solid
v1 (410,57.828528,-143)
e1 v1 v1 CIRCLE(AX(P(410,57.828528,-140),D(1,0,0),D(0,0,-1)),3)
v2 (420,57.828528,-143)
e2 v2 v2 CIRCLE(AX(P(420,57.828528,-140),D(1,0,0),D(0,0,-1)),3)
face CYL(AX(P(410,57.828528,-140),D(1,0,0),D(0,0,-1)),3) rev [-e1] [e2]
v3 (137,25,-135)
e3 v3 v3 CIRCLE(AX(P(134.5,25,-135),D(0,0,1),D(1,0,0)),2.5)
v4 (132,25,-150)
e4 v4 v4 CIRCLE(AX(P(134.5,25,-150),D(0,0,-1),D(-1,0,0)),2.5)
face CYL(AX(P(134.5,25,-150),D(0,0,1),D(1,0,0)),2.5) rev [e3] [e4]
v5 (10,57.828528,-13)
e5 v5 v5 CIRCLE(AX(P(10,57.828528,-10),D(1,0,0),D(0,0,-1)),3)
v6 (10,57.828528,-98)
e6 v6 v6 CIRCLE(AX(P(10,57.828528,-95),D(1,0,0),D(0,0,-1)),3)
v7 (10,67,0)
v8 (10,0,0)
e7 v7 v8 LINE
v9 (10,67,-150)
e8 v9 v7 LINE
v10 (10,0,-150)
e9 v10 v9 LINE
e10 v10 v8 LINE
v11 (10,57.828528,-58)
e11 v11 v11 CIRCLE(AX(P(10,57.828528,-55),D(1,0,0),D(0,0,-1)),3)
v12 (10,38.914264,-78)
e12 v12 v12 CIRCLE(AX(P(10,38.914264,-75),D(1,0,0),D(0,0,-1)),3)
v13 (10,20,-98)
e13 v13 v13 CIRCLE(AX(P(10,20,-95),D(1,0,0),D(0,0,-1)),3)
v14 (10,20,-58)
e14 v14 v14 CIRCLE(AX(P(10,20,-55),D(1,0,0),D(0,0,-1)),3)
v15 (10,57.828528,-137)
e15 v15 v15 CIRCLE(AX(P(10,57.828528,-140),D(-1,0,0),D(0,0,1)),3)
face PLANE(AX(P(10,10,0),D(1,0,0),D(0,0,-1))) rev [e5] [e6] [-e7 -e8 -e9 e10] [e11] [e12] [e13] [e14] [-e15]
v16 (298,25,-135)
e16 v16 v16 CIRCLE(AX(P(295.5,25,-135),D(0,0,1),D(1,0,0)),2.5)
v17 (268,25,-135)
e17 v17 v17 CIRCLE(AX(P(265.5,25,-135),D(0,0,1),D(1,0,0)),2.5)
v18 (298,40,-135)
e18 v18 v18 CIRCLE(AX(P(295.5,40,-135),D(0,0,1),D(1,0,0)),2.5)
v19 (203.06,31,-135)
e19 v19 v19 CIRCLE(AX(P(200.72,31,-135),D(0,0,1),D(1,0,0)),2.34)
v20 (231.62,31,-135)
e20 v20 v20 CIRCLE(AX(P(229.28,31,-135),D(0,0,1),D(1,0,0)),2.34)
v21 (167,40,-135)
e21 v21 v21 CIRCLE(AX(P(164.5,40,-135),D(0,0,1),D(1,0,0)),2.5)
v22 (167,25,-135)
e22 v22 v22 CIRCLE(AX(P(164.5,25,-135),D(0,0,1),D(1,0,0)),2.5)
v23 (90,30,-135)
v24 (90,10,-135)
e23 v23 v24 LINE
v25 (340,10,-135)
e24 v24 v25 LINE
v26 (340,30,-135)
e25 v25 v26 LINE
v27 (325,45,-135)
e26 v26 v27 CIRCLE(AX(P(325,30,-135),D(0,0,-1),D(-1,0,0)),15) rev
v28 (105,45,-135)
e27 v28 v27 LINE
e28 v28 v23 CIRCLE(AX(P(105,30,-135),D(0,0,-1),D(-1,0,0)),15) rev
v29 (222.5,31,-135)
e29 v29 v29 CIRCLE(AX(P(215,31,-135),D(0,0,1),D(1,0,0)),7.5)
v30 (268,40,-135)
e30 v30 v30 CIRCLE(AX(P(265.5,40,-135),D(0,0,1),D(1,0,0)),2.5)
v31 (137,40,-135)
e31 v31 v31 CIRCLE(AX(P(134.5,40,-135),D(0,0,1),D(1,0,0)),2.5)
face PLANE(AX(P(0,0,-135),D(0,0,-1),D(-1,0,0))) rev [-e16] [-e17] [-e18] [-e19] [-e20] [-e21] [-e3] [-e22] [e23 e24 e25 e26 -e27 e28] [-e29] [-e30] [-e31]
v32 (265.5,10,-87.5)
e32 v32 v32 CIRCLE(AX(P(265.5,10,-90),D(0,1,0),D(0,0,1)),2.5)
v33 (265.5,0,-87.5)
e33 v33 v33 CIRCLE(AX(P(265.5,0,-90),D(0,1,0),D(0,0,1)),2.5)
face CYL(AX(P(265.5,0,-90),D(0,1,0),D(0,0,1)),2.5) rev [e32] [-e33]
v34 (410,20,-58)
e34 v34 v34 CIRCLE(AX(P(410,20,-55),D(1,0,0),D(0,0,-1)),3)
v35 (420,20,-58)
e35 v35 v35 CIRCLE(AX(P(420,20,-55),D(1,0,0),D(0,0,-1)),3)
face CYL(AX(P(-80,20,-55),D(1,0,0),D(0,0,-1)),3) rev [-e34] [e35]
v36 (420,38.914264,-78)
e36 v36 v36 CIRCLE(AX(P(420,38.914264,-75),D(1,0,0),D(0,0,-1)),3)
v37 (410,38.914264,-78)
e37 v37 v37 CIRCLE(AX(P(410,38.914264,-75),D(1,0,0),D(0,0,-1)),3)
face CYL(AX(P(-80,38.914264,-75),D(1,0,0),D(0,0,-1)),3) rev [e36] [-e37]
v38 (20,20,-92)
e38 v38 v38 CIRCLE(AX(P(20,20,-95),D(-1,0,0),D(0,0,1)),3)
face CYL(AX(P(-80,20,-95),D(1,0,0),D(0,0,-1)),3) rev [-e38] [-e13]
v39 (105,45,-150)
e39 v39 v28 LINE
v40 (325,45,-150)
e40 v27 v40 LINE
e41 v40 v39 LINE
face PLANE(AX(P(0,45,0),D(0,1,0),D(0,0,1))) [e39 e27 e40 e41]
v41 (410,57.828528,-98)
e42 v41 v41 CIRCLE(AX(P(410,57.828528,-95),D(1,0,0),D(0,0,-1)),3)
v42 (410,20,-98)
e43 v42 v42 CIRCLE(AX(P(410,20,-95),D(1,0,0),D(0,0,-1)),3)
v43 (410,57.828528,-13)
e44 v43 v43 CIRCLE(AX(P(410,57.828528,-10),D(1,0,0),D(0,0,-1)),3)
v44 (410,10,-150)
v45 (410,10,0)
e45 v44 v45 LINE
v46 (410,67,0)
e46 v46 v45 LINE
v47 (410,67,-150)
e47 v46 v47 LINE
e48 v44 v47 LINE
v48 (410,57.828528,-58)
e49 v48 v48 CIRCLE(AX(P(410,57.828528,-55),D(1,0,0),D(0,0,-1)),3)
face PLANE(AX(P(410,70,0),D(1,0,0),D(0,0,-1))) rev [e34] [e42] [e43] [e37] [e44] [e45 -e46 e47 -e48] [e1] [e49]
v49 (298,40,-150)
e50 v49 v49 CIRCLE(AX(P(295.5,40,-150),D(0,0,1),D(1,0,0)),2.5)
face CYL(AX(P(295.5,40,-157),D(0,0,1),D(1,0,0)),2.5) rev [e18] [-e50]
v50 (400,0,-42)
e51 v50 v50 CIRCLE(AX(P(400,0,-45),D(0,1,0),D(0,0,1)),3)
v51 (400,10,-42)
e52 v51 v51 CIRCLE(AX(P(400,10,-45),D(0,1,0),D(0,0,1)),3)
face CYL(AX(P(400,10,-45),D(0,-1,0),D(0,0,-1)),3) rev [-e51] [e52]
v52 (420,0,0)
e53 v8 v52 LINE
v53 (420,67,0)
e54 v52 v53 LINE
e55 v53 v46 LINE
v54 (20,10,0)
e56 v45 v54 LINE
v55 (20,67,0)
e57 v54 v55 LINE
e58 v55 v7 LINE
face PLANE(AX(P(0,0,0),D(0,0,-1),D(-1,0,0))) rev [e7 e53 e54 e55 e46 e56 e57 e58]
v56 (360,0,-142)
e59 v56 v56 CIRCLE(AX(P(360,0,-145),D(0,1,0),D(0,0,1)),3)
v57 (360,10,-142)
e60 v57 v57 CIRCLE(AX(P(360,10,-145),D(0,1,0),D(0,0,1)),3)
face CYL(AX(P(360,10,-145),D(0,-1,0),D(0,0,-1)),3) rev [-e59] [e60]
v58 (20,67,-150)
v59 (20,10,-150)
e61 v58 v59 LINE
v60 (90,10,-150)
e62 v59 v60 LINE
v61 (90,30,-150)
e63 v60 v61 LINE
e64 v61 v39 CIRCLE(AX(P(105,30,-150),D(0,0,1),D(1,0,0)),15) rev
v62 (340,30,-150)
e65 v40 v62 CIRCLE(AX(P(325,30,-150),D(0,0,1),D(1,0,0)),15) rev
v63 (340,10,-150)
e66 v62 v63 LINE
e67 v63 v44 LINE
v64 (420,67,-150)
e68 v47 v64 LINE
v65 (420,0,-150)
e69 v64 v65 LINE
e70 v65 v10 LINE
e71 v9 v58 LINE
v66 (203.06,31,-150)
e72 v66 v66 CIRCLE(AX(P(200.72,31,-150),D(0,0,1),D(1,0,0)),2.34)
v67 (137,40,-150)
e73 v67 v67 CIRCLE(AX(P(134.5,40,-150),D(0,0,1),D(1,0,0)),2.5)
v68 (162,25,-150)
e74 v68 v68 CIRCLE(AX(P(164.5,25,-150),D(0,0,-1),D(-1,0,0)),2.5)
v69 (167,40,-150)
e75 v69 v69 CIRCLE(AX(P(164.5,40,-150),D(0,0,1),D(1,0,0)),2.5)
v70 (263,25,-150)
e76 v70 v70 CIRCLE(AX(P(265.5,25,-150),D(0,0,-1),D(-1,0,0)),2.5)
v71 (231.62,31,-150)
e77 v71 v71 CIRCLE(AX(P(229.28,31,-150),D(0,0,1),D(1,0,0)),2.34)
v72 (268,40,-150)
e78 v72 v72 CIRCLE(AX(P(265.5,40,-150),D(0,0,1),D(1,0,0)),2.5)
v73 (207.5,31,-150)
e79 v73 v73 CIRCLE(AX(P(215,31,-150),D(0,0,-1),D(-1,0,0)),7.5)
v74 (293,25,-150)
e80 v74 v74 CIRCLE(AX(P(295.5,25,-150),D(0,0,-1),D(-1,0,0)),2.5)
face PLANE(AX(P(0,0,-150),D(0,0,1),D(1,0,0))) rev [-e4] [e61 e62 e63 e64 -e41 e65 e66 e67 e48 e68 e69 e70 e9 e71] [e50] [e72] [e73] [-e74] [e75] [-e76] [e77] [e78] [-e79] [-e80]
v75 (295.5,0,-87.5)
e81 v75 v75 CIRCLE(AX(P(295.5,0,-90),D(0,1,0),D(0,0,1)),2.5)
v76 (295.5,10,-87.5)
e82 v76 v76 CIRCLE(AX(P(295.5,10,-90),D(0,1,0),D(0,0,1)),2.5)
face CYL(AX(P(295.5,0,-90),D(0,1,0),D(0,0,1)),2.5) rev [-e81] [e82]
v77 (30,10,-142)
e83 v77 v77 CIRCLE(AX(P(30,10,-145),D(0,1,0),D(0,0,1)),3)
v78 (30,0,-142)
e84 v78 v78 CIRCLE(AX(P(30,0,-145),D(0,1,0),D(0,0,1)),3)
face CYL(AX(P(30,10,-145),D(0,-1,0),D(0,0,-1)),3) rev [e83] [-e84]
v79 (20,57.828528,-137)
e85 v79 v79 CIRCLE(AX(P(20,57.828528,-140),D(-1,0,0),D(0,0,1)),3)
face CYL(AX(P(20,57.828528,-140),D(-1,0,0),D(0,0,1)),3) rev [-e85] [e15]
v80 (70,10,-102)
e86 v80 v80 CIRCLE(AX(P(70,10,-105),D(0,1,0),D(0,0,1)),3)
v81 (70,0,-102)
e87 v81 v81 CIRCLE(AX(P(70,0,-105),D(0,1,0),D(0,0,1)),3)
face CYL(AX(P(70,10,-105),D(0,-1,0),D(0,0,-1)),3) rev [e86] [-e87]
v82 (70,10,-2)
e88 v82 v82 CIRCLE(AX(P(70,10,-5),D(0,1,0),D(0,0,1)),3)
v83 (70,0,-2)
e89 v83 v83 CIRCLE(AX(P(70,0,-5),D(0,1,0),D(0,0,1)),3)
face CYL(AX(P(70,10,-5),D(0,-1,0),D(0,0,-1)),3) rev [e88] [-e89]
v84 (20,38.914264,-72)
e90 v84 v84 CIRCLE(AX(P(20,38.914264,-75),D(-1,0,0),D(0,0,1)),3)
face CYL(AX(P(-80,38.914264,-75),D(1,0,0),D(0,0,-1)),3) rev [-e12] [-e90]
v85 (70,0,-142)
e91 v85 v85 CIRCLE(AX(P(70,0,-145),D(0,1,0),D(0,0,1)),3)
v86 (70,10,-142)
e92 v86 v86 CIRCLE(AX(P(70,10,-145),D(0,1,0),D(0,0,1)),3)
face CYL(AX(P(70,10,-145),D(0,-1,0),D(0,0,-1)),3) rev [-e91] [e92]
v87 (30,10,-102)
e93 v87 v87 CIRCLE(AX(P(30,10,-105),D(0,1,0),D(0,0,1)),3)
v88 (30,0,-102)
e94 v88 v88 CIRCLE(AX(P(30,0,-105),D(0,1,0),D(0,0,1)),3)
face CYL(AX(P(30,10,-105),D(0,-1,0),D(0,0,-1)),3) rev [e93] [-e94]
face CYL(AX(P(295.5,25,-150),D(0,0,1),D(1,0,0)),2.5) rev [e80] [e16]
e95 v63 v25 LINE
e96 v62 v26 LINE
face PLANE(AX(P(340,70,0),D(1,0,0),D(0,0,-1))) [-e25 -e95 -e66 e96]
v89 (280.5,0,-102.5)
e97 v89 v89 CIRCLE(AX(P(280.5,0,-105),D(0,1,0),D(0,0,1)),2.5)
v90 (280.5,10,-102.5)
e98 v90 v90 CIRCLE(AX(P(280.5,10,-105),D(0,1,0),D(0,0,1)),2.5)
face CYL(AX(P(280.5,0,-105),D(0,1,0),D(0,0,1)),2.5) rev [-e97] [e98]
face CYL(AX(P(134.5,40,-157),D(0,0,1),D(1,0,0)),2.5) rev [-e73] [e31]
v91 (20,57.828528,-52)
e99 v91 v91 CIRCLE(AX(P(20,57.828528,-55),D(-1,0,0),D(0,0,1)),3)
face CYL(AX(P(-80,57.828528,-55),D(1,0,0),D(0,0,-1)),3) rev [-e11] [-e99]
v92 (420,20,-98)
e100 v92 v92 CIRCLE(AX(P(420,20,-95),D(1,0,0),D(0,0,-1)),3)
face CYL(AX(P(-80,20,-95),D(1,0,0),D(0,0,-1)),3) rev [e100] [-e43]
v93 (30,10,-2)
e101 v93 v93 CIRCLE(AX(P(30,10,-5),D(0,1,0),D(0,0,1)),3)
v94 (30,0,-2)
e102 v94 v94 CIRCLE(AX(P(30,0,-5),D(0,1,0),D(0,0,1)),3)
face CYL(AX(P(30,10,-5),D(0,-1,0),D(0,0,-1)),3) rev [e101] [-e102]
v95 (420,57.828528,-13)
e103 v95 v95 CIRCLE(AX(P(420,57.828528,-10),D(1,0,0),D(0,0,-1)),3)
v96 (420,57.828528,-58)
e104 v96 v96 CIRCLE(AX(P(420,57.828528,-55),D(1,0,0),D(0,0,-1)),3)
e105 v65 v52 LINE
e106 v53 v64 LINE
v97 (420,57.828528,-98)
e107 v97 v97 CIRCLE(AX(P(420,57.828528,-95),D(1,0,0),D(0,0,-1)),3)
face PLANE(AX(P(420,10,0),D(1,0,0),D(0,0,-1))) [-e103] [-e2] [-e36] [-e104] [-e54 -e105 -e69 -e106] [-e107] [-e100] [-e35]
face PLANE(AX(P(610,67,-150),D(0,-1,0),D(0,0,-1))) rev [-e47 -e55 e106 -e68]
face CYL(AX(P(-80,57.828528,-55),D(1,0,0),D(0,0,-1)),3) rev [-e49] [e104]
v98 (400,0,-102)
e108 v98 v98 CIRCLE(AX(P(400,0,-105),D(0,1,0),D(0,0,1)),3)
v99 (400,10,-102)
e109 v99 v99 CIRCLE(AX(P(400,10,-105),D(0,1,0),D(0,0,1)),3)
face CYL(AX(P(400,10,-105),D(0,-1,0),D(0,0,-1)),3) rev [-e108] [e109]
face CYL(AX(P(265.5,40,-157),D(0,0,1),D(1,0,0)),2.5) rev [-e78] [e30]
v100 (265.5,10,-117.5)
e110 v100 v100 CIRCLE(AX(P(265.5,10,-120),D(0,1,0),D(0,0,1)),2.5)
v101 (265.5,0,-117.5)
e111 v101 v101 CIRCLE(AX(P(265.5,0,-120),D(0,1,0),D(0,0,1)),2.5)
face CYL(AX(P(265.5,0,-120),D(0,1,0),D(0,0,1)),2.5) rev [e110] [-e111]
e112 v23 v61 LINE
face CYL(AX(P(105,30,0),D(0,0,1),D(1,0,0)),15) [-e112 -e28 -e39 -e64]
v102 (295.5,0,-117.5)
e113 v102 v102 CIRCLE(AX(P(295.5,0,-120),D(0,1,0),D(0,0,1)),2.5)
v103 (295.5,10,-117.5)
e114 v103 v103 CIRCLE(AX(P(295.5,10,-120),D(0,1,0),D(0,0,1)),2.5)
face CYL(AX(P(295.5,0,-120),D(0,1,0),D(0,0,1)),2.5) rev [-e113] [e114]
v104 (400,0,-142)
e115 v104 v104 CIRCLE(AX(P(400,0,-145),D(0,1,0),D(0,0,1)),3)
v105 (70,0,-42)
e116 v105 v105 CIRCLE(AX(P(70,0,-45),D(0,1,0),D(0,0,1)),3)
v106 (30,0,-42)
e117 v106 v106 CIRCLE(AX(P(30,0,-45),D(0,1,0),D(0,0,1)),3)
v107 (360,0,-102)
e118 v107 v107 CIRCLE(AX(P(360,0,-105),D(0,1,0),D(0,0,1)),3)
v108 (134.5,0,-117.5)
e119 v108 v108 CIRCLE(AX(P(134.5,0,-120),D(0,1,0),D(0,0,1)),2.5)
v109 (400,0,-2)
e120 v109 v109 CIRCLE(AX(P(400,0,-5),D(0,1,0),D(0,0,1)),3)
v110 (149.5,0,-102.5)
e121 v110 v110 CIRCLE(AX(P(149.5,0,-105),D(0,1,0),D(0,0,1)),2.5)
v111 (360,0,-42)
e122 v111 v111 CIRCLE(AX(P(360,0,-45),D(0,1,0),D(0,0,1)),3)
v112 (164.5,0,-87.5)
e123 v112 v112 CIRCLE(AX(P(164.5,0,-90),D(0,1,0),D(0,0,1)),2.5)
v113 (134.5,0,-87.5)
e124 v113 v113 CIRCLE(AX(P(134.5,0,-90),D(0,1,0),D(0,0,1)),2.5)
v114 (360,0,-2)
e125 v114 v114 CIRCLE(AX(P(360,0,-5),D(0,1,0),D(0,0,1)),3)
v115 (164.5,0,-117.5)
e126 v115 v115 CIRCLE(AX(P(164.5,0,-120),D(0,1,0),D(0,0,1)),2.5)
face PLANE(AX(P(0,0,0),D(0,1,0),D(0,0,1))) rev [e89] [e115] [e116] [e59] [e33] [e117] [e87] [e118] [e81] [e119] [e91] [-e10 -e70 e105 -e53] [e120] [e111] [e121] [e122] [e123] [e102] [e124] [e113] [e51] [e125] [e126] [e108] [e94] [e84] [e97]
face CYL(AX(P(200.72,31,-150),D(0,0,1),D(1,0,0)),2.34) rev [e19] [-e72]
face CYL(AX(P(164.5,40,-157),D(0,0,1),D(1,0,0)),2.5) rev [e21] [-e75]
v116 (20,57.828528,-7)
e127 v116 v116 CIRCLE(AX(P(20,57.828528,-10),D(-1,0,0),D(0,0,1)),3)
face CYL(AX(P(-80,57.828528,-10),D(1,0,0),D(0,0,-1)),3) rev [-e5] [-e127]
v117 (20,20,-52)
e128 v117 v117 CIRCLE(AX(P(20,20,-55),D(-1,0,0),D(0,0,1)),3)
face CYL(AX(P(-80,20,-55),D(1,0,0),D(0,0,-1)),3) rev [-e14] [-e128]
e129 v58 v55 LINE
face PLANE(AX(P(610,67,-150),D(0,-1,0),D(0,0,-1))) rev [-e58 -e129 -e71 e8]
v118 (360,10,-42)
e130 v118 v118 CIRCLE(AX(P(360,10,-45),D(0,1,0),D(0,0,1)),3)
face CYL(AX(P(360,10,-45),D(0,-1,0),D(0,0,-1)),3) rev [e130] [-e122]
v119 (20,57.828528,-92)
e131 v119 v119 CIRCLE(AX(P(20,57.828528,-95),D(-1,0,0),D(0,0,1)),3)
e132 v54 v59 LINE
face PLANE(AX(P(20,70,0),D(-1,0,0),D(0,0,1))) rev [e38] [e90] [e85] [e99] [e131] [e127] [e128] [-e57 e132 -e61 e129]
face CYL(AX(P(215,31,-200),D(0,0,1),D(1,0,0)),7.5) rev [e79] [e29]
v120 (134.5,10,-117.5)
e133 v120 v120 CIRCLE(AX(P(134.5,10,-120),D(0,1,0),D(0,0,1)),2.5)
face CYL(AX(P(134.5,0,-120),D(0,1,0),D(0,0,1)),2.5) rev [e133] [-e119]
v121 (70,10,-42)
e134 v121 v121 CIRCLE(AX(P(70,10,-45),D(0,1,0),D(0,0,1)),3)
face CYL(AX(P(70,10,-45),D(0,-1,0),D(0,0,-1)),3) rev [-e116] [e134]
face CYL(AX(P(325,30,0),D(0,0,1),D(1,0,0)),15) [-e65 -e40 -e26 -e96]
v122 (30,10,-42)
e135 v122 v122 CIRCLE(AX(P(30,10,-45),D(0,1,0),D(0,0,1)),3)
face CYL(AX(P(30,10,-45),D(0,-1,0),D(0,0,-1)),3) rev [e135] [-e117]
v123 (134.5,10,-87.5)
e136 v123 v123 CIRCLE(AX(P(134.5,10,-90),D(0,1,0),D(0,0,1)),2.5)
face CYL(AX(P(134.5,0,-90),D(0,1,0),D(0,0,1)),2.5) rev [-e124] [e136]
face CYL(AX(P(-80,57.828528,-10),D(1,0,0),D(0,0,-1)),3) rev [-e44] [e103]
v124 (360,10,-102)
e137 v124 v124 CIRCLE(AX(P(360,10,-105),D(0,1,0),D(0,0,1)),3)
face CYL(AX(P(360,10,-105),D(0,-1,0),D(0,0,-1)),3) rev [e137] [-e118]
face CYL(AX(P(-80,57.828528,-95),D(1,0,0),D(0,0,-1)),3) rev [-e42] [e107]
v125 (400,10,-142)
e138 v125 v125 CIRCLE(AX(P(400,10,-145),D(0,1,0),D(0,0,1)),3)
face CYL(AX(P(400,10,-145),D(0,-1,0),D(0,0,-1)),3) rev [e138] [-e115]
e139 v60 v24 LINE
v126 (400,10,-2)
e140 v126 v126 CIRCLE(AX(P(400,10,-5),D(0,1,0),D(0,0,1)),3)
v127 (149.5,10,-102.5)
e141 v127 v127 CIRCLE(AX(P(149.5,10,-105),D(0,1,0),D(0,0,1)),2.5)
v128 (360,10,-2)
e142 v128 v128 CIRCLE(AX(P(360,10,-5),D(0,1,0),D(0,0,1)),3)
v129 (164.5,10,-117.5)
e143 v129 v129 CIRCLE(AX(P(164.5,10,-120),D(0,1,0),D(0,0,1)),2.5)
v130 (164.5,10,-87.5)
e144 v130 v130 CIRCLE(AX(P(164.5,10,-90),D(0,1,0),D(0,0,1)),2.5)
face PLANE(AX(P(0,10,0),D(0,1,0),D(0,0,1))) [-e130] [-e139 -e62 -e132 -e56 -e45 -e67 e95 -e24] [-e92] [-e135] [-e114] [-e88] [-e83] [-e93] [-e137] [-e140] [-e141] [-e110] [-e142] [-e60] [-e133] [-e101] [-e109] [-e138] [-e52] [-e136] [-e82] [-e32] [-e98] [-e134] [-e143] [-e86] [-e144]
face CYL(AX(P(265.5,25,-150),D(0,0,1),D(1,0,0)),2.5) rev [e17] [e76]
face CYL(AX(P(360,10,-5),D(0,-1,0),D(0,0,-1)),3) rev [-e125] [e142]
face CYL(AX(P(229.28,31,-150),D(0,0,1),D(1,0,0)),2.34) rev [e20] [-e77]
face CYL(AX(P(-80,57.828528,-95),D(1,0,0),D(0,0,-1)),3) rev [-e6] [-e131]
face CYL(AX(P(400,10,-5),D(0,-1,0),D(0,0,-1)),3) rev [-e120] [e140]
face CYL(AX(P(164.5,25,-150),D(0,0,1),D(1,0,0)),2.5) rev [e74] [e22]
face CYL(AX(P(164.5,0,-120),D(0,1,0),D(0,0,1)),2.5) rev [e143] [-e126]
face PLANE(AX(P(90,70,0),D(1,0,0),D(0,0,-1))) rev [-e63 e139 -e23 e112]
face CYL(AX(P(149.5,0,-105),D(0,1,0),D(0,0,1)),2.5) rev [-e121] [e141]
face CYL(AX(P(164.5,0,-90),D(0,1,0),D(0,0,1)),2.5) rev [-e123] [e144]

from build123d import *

# Parameters (mm, degrees)
SKETCH1_W            = 410
SKETCH1_H            = 150
SKETCH1_R            = 3
BOSS_EXTRUDE1_DEPTH  = 10
SKETCH2_W            = 10
SKETCH2_H            = 150
BOSS_EXTRUDE3_DEPTH  = 60
SKETCH3_W            = 250
SKETCH3_H            = 10
BOSS_EXTRUDE4_DEPTH  = 60
FILLET2_R            = 25
SKETCH4_R            = 7.5
CUT_EXTRUDE1_DEPTH   = 60
SKETCH5_R            = 3
CUT_EXTRUDE2_DEPTH   = 500
SKETCH6_R            = 3
CUT_EXTRUDE3_DEPTH   = 10
SKETCH7_R            = 3
BOSS_EXTRUDE5_DEPTH  = 10
CUT_EXTRUDE4_START   = -10
SKETCH8_R            = 3
CUT_EXTRUDE4_DEPTH   = 10
BOSS_EXTRUDE6_START  = -10
SKETCH9_R            = 3
BOSS_EXTRUDE6_DEPTH  = 10
SKETCH10_W           = 150
SKETCH10_H           = 3
CUT_EXTRUDE5_DEPTH   = 600
SKETCH11_R           = 2.5
CUT_EXTRUDE6_DEPTH   = 448.759980347
SKETCH12_R           = 2.5
CUT_EXTRUDE7_DEPTH   = 10
SKETCH14_R           = 2.5
CUT_EXTRUDE8_DEPTH   = 10
SKETCH16_R           = 2.5
CUT_EXTRUDE9_DEPTH   = 10
SKETCH17_R           = 2.5
BOSS_EXTRUDE7_DEPTH  = 10
SKETCH18_R           = 2.5
SKETCH18_R_2         = 7.5
BOSS_EXTRUDE8_DEPTH  = 5
FILLET3_R            = 22
FILLET4_R            = 22
BOSS_EXTRUDE9_DEPTH  = 5
CUT_EXTRUDE11_DEPTH  = 5
CUT_EXTRUDE12_START  = -5
SKETCH21_R           = 2.5
SKETCH21_R_2         = 7.5
CUT_EXTRUDE12_DEPTH  = 5
BOSS_EXTRUDE10_START = 5
SKETCH22_W           = 250
SKETCH22_H           = 57
SKETCH22_R           = 2.5
SKETCH22_R_2         = 7.5
BOSS_EXTRUDE10_DEPTH = 5
FILLET5_R            = 22
SKETCH23_R           = 2.5
BOSS_EXTRUDE12_DEPTH = 5
SKETCH24_R           = 2.5
BOSS_EXTRUDE13_DEPTH = 10
CUT_EXTRUDE19_START  = -10
SKETCH25_R           = 2.5
CUT_EXTRUDE19_DEPTH  = 10
SKETCH27_W           = 250
SKETCH27_H           = 15
CUT_EXTRUDE20_DEPTH  = 22
SKETCH28_R           = 2.5
CUT_EXTRUDE21_DEPTH  = 22
FILLET6_R            = 15
FILLET7_R            = 15
SKETCH30_R           = 2.5
SKETCH30_R_2         = 2.34
BOSS_EXTRUDE15_DEPTH = 15
SKETCH32_R           = 2.5
BOSS_EXTRUDE17_DEPTH = 15


with BuildPart() as part:
    # Sketch1 → Boss-Extrude1 (new body)
    with BuildSketch(Plane(origin=(0, 0, 0), x_dir=(1, 0, 0), z_dir=(0, 1, 0))):
        with Locations((215, 75)):
            Rectangle(SKETCH1_W, SKETCH1_H)
        with Locations(Location((30, 5, 0), (0, 0, 270))):
            Circle(SKETCH1_R, mode=Mode.SUBTRACT)
        with Locations(Location((70, 5, 0), (0, 0, 270))):
            Circle(SKETCH1_R, mode=Mode.SUBTRACT)
        with Locations(Location((30, 45, 0), (0, 0, 270))):
            Circle(SKETCH1_R, mode=Mode.SUBTRACT)
        with Locations(Location((70, 45, 0), (0, 0, 270))):
            Circle(SKETCH1_R, mode=Mode.SUBTRACT)
        with Locations(Location((360, 5, 0), (0, 0, 270))):
            Circle(SKETCH1_R, mode=Mode.SUBTRACT)
        with Locations(Location((400, 5, 0), (0, 0, 270))):
            Circle(SKETCH1_R, mode=Mode.SUBTRACT)
        with Locations(Location((360, 45, 0), (0, 0, 270))):
            Circle(SKETCH1_R, mode=Mode.SUBTRACT)
        with Locations(Location((400, 45, 0), (0, 0, 270))):
            Circle(SKETCH1_R, mode=Mode.SUBTRACT)
        with Locations(Location((30, 105, 0), (0, 0, 270))):
            Circle(SKETCH1_R, mode=Mode.SUBTRACT)
        with Locations(Location((70, 105, 0), (0, 0, 270))):
            Circle(SKETCH1_R, mode=Mode.SUBTRACT)
        with Locations(Location((30, 145, 0), (0, 0, 270))):
            Circle(SKETCH1_R, mode=Mode.SUBTRACT)
        with Locations(Location((70, 145, 0), (0, 0, 270))):
            Circle(SKETCH1_R, mode=Mode.SUBTRACT)
        with Locations(Location((360, 105, 0), (0, 0, 270))):
            Circle(SKETCH1_R, mode=Mode.SUBTRACT)
        with Locations(Location((400, 105, 0), (0, 0, 270))):
            Circle(SKETCH1_R, mode=Mode.SUBTRACT)
        with Locations(Location((360, 145, 0), (0, 0, 270))):
            Circle(SKETCH1_R, mode=Mode.SUBTRACT)
        with Locations(Location((400, 145, 0), (0, 0, 270))):
            Circle(SKETCH1_R, mode=Mode.SUBTRACT)
    extrude(amount=BOSS_EXTRUDE1_DEPTH)

    # Sketch2 → Boss-Extrude3 (add)
    with BuildSketch(Plane(origin=(0, 10, 0), x_dir=(1, 0, 0), z_dir=(0, 1, 0))):
        with Locations((15, 75)):
            Rectangle(SKETCH2_W, SKETCH2_H)
        with Locations((415, 75)):
            Rectangle(SKETCH2_W, SKETCH2_H)
    extrude(amount=BOSS_EXTRUDE3_DEPTH)

    # Sketch3 → Boss-Extrude4 (add)
    with BuildSketch(Plane(origin=(0, 10, 0), x_dir=(1, 0, 0), z_dir=(0, 1, 0))):
        with Locations((215, 145)):
            Rectangle(SKETCH3_W, SKETCH3_H)
    extrude(amount=BOSS_EXTRUDE4_DEPTH)

    # Fillet2
    fillet2_edges = [part.edges().sort_by_distance(p)[0] for p in [
        (340, 70, -145),
        (90, 70, -145),
    ]]
    fillet(fillet2_edges, radius=FILLET2_R)

    # Sketch4 → Cut-Extrude1 (cut)
    with BuildSketch(Plane.XY.offset(-140)):
        with Locations((215, 31)):
            Circle(SKETCH4_R)
    extrude(amount=-CUT_EXTRUDE1_DEPTH, mode=Mode.SUBTRACT)

    # Sketch5 → Cut-Extrude2 (cut)
    with BuildSketch(Plane(origin=(420, 0, 0), x_dir=(0, 0, -1), z_dir=(1, 0, 0))):
        with Locations((10, 57.828527729)):
            Circle(SKETCH5_R)
        with Locations((55, 57.828527729)):
            Circle(SKETCH5_R)
        with Locations((95, 57.828527729)):
            Circle(SKETCH5_R)
        with Locations((130, 57.828527729)):
            Circle(SKETCH5_R)
        with Locations((75, 38.914263864)):
            Circle(SKETCH5_R)
        with Locations((95, 20)):
            Circle(SKETCH5_R)
        with Locations((55, 20)):
            Circle(SKETCH5_R)
    extrude(amount=-CUT_EXTRUDE2_DEPTH, mode=Mode.SUBTRACT)

    # Sketch6 → Cut-Extrude3 (cut)
    with BuildSketch(Plane(origin=(420, 0, 0), x_dir=(0, 0, -1), z_dir=(1, 0, 0))):
        with Locations((140, 57.828527729)):
            Circle(SKETCH6_R)
    extrude(amount=-CUT_EXTRUDE3_DEPTH, mode=Mode.SUBTRACT)

    # Sketch7 → Boss-Extrude5 (add)
    with BuildSketch(Plane(origin=(420, 0, 0), x_dir=(0, 0, -1), z_dir=(1, 0, 0))):
        with Locations((130, 57.828527729)):
            Circle(SKETCH7_R)
    extrude(amount=-BOSS_EXTRUDE5_DEPTH)

    # Sketch8 → Cut-Extrude4 (cut)
    with BuildSketch(Plane.ZY.offset(-10).offset(CUT_EXTRUDE4_START)):
        with Locations(Location((-140, 57.828527729, 0), (0, 0, 180))):
            Circle(SKETCH8_R)
    extrude(amount=CUT_EXTRUDE4_DEPTH, mode=Mode.SUBTRACT)

    # Sketch9 → Boss-Extrude6 (add)
    with BuildSketch(Plane.ZY.offset(-10).offset(BOSS_EXTRUDE6_START)):
        with Locations((-130, 57.828527729)):
            Circle(SKETCH9_R)
    extrude(amount=BOSS_EXTRUDE6_DEPTH)

    # Sketch10 → Cut-Extrude5 (cut)
    with BuildSketch(Plane.ZY.offset(-10)):
        with Locations((-75, 68.5)):
            Rectangle(SKETCH10_W, SKETCH10_H)
    extrude(amount=-CUT_EXTRUDE5_DEPTH, mode=Mode.SUBTRACT)

    # Sketch11 → Cut-Extrude6 (cut, through all)
    with BuildSketch(Plane.XY.offset(-140)):
        with Locations((200.72, 31)):
            Circle(SKETCH11_R)
        with Locations((229.28, 31)):
            Circle(SKETCH11_R)
    extrude(amount=-CUT_EXTRUDE6_DEPTH, mode=Mode.SUBTRACT)

    # Sketch12 → Cut-Extrude7 (cut)
    with BuildSketch(Plane.XY.offset(-140)):
        with Locations((134.5, 55)):
            Circle(SKETCH12_R)
        with Locations((164.5, 55)):
            Circle(SKETCH12_R)
        with Locations((149.5, 40)):
            Circle(SKETCH12_R)
        with Locations((134.5, 25)):
            Circle(SKETCH12_R)
        with Locations((164.5, 25)):
            Circle(SKETCH12_R)
        with Locations((265.5, 55)):
            Circle(SKETCH12_R)
        with Locations((295.5, 55)):
            Circle(SKETCH12_R)
        with Locations((280.5, 40)):
            Circle(SKETCH12_R)
        with Locations((295.5, 25)):
            Circle(SKETCH12_R)
        with Locations((265.5, 25)):
            Circle(SKETCH12_R)
    extrude(amount=-CUT_EXTRUDE7_DEPTH, mode=Mode.SUBTRACT)

    # Sketch14 → Cut-Extrude8 (cut)
    with BuildSketch(Plane(origin=(0, 10, 0), x_dir=(1, 0, 0), z_dir=(0, 1, 0))):
        with Locations(Location((144.5, 125, 0), (0, 0, 270))):
            Circle(SKETCH14_R)
        with Locations(Location((174.5, 125, 0), (0, 0, 270))):
            Circle(SKETCH14_R)
        with Locations(Location((159.5, 110, 0), (0, 0, 270))):
            Circle(SKETCH14_R)
        with Locations(Location((174.5, 95, 0), (0, 0, 270))):
            Circle(SKETCH14_R)
        with Locations(Location((144.5, 95, 0), (0, 0, 270))):
            Circle(SKETCH14_R)
        with Locations(Location((255.5, 125, 0), (0, 0, 270))):
            Circle(SKETCH14_R)
        with Locations(Location((285.5, 125, 0), (0, 0, 270))):
            Circle(SKETCH14_R)
        with Locations(Location((270.5, 110, 0), (0, 0, 270))):
            Circle(SKETCH14_R)
        with Locations(Location((255.5, 95, 0), (0, 0, 270))):
            Circle(SKETCH14_R)
        with Locations(Location((285.5, 95, 0), (0, 0, 270))):
            Circle(SKETCH14_R)
    extrude(amount=-CUT_EXTRUDE8_DEPTH, mode=Mode.SUBTRACT)

    # Sketch16 → Cut-Extrude9 (cut)
    with BuildSketch(Plane(origin=(0, 10, 0), x_dir=(1, 0, 0), z_dir=(0, 1, 0))):
        with Locations(Location((164.5, 125, 0), (0, 0, 270))):
            Circle(SKETCH16_R)
        with Locations(Location((149.5, 110, 0), (0, 0, 270))):
            Circle(SKETCH16_R)
        with Locations(Location((164.5, 95, 0), (0, 0, 270))):
            Circle(SKETCH16_R)
        with Locations(Location((134.5, 95, 0), (0, 0, 270))):
            Circle(SKETCH16_R)
        with Locations(Location((134.5, 125, 0), (0, 0, 270))):
            Circle(SKETCH16_R)
        with Locations(Location((265.5, 125, 0), (0, 0, 270))):
            Circle(SKETCH16_R)
        with Locations(Location((280.5, 110, 0), (0, 0, 270))):
            Circle(SKETCH16_R)
        with Locations(Location((295.5, 125, 0), (0, 0, 270))):
            Circle(SKETCH16_R)
        with Locations(Location((265.5, 95, 0), (0, 0, 270))):
            Circle(SKETCH16_R)
        with Locations(Location((295.5, 95, 0), (0, 0, 270))):
            Circle(SKETCH16_R)
    extrude(amount=-CUT_EXTRUDE9_DEPTH, mode=Mode.SUBTRACT)

    # Sketch17 → Boss-Extrude7 (add)
    with BuildSketch(Plane(origin=(0, 10, 0), x_dir=(1, 0, 0), z_dir=(0, 1, 0))):
        with Locations((144.5, 125)):
            Circle(SKETCH17_R)
        with Locations((174.5, 125)):
            Circle(SKETCH17_R)
        with Locations((159.5, 110)):
            Circle(SKETCH17_R)
        with Locations((144.5, 95)):
            Circle(SKETCH17_R)
        with Locations((174.5, 95)):
            Circle(SKETCH17_R)
        with Locations((285.5, 125)):
            Circle(SKETCH17_R)
        with Locations((255.5, 125)):
            Circle(SKETCH17_R)
        with Locations((270.5, 110)):
            Circle(SKETCH17_R)
        with Locations((255.5, 95)):
            Circle(SKETCH17_R)
        with Locations((285.5, 95)):
            Circle(SKETCH17_R)
    extrude(amount=-BOSS_EXTRUDE7_DEPTH)

    # Sketch18 → Boss-Extrude8 (add)
    with BuildSketch(Plane(origin=(0, 0, -150), x_dir=(-1, 0, 0), z_dir=(0, 0, -1))):
        Polygon((-340, 10), (-410, 10), (-410, 67), (-420, 67), (-420, 0), (-10, 0), (-10, 67), (-20, 67), (-20, 10), (-90, 10), (-90, 67), (-340, 67), align=None)
        with Locations(Location((-295.5, 55, 0), (0, 0, 180))):
            Circle(SKETCH18_R, mode=Mode.SUBTRACT)
        with Locations(Location((-280.5, 40, 0), (0, 0, 180))):
            Circle(SKETCH18_R, mode=Mode.SUBTRACT)
        with Locations(Location((-265.5, 55, 0), (0, 0, 180))):
            Circle(SKETCH18_R, mode=Mode.SUBTRACT)
        with Locations(Location((-295.5, 25, 0), (0, 0, 180))):
            Circle(SKETCH18_R, mode=Mode.SUBTRACT)
        with Locations(Location((-265.5, 25, 0), (0, 0, 180))):
            Circle(SKETCH18_R, mode=Mode.SUBTRACT)
        with Locations(Location((-229.28, 31, 0), (0, 0, 180))):
            Circle(SKETCH18_R, mode=Mode.SUBTRACT)
        with Locations(Location((-215, 31, 0), (0, 0, 180))):
            Circle(SKETCH18_R_2, mode=Mode.SUBTRACT)
        with Locations(Location((-200.72, 31, 0), (0, 0, 180))):
            Circle(SKETCH18_R, mode=Mode.SUBTRACT)
        with Locations(Location((-164.5, 55, 0), (0, 0, 180))):
            Circle(SKETCH18_R, mode=Mode.SUBTRACT)
        with Locations(Location((-134.5, 55, 0), (0, 0, 180))):
            Circle(SKETCH18_R, mode=Mode.SUBTRACT)
        with Locations(Location((-149.5, 40, 0), (0, 0, 180))):
            Circle(SKETCH18_R, mode=Mode.SUBTRACT)
        with Locations(Location((-134.5, 25, 0), (0, 0, 180))):
            Circle(SKETCH18_R, mode=Mode.SUBTRACT)
        with Locations(Location((-164.5, 25, 0), (0, 0, 180))):
            Circle(SKETCH18_R, mode=Mode.SUBTRACT)
    extrude(amount=BOSS_EXTRUDE8_DEPTH)

    # Fillet3
    # the kernel refuses this fillet: 22 mm, written as the material it takes off along each edge
    with BuildSketch(Plane(origin=(340, 67, -95), x_dir=(0, -1, 0), z_dir=(0, 0, -1))) as fillet3_piece_1:
        with BuildLine():
            CenterArc((FILLET3_R, FILLET3_R), FILLET3_R, 180, 90)
            Line((0, FILLET3_R), (0, 0))
            Line((0, 0), (FILLET3_R, 0))
        make_face()
    extrude(amount=115, mode=Mode.SUBTRACT)

    # Fillet4
    # the kernel refuses this fillet: 22 mm, written as the material it takes off along each edge
    with BuildSketch(Plane(origin=(90, 67, -95), x_dir=(0, -1, 0), z_dir=(0, 0, -1))) as fillet4_piece_1:
        with BuildLine():
            CenterArc((FILLET4_R, -FILLET4_R), FILLET4_R, 90, 90)
            Line((0, -FILLET4_R), (0, 0))
            Line((0, 0), (FILLET4_R, 0))
        make_face()
    extrude(amount=115, mode=Mode.SUBTRACT)

    # Sketch19 → Boss-Extrude9 (add)
    with BuildSketch(Plane.XY):
        Polygon((10, 67), (20, 67), (20, 10), (410, 10), (410, 67), (420, 67), (420, 0), (10, 0), align=None)
    extrude(amount=BOSS_EXTRUDE9_DEPTH)

    # Sketch20 → Cut-Extrude11 (cut)
    with BuildSketch(Plane.XY.offset(5)):
        Polygon((10, 67), (20, 67), (20, 10), (410, 10), (410, 67), (420, 67), (420, 0), (10, 0), align=None)
    extrude(amount=-CUT_EXTRUDE11_DEPTH, mode=Mode.SUBTRACT)

    # Sketch21 → Cut-Extrude12 (cut)
    with BuildSketch(Plane(origin=(0, 0, -155), x_dir=(-1, 0, 0), z_dir=(0, 0, -1)).offset(CUT_EXTRUDE12_START)):
        Polygon((-420, 67), (-410, 67), (-410, 10), (-340, 10), (-340, 67), (-90, 67), (-90, 10), (-20, 10), (-20, 67), (-10, 67), (-10, 0), (-420, 0), align=None)
        with Locations(Location((-295.5, 55, 0), (0, 0, 180))):
            Circle(SKETCH21_R, mode=Mode.SUBTRACT)
        with Locations(Location((-265.5, 55, 0), (0, 0, 180))):
            Circle(SKETCH21_R, mode=Mode.SUBTRACT)
        with Locations(Location((-215, 31, 0), (0, 0, 180))):
            Circle(SKETCH21_R_2, mode=Mode.SUBTRACT)
        with Locations(Location((-200.72, 31, 0), (0, 0, 180))):
            Circle(SKETCH21_R, mode=Mode.SUBTRACT)
        with Locations(Location((-229.28, 31, 0), (0, 0, 180))):
            Circle(SKETCH21_R, mode=Mode.SUBTRACT)
        with Locations(Location((-265.5, 25, 0), (0, 0, 180))):
            Circle(SKETCH21_R, mode=Mode.SUBTRACT)
        with Locations(Location((-280.5, 40, 0), (0, 0, 180))):
            Circle(SKETCH21_R, mode=Mode.SUBTRACT)
        with Locations(Location((-295.5, 25, 0), (0, 0, 180))):
            Circle(SKETCH21_R, mode=Mode.SUBTRACT)
        with Locations(Location((-164.5, 55, 0), (0, 0, 180))):
            Circle(SKETCH21_R, mode=Mode.SUBTRACT)
        with Locations(Location((-149.5, 40, 0), (0, 0, 180))):
            Circle(SKETCH21_R, mode=Mode.SUBTRACT)
        with Locations(Location((-164.5, 25, 0), (0, 0, 180))):
            Circle(SKETCH21_R, mode=Mode.SUBTRACT)
        with Locations(Location((-134.5, 25, 0), (0, 0, 180))):
            Circle(SKETCH21_R, mode=Mode.SUBTRACT)
        with Locations(Location((-134.5, 55, 0), (0, 0, 180))):
            Circle(SKETCH21_R, mode=Mode.SUBTRACT)
    extrude(amount=CUT_EXTRUDE12_DEPTH, mode=Mode.SUBTRACT)

    # Sketch22 → Boss-Extrude10 (add)
    with BuildSketch(Plane.XY.offset(-140).offset(BOSS_EXTRUDE10_START)):
        with Locations((215, 38.5)):
            Rectangle(SKETCH22_W, SKETCH22_H)
        with Locations((134.5, 55)):
            Circle(SKETCH22_R, mode=Mode.SUBTRACT)
        with Locations((164.5, 55)):
            Circle(SKETCH22_R, mode=Mode.SUBTRACT)
        with Locations((149.5, 40)):
            Circle(SKETCH22_R, mode=Mode.SUBTRACT)
        with Locations((164.5, 25)):
            Circle(SKETCH22_R, mode=Mode.SUBTRACT)
        with Locations((134.5, 25)):
            Circle(SKETCH22_R, mode=Mode.SUBTRACT)
        with Locations((215, 31)):
            Circle(SKETCH22_R_2, mode=Mode.SUBTRACT)
        with Locations((229.28, 31)):
            Circle(SKETCH22_R, mode=Mode.SUBTRACT)
        with Locations((200.72, 31)):
            Circle(SKETCH22_R, mode=Mode.SUBTRACT)
        with Locations((265.5, 55)):
            Circle(SKETCH22_R, mode=Mode.SUBTRACT)
        with Locations((280.5, 40)):
            Circle(SKETCH22_R, mode=Mode.SUBTRACT)
        with Locations((295.5, 55)):
            Circle(SKETCH22_R, mode=Mode.SUBTRACT)
        with Locations((295.5, 25)):
            Circle(SKETCH22_R, mode=Mode.SUBTRACT)
        with Locations((265.5, 25)):
            Circle(SKETCH22_R, mode=Mode.SUBTRACT)
    extrude(amount=-BOSS_EXTRUDE10_DEPTH)

    # Fillet5
    fillet5_edges = [part.edges().sort_by_distance(p)[0] for p in [
        (90, 67, -137.5),
        (340, 67, -137.5),
    ]]
    fillet(fillet5_edges, radius=FILLET5_R)

    # Sketch23 → Boss-Extrude12 (add)
    with BuildSketch(Plane(origin=(0, 10, 0), x_dir=(1, 0, 0), z_dir=(0, 1, 0))):
        with Locations(Location((265.5, 120, 0), (0, 0, 90))):
            Circle(SKETCH23_R)
        with Locations(Location((295.5, 120, 0), (0, 0, 90))):
            Circle(SKETCH23_R)
        with Locations(Location((280.5, 105, 0), (0, 0, 90))):
            Circle(SKETCH23_R)
        with Locations(Location((295.5, 90, 0), (0, 0, 90))):
            Circle(SKETCH23_R)
        with Locations(Location((265.5, 90, 0), (0, 0, 90))):
            Circle(SKETCH23_R)
        with Locations(Location((164.5, 120, 0), (0, 0, 90))):
            Circle(SKETCH23_R)
        with Locations(Location((134.5, 120, 0), (0, 0, 90))):
            Circle(SKETCH23_R)
        with Locations(Location((149.5, 105, 0), (0, 0, 90))):
            Circle(SKETCH23_R)
        with Locations(Location((164.5, 90, 0), (0, 0, 90))):
            Circle(SKETCH23_R)
        with Locations(Location((134.5, 90, 0), (0, 0, 90))):
            Circle(SKETCH23_R)
    extrude(amount=BOSS_EXTRUDE12_DEPTH)

    # Sketch24 → Boss-Extrude13 (add)
    with BuildSketch(Plane(origin=(0, 10, 0), x_dir=(1, 0, 0), z_dir=(0, 1, 0))):
        with Locations((295.5, 125)):
            Circle(SKETCH24_R)
        with Locations((265.5, 125)):
            Circle(SKETCH24_R)
        with Locations((280.5, 110)):
            Circle(SKETCH24_R)
        with Locations((295.5, 95)):
            Circle(SKETCH24_R)
        with Locations((265.5, 95)):
            Circle(SKETCH24_R)
        with Locations((164.5, 125)):
            Circle(SKETCH24_R)
        with Locations((134.5, 125)):
            Circle(SKETCH24_R)
        with Locations((149.5, 110)):
            Circle(SKETCH24_R)
        with Locations((164.5, 95)):
            Circle(SKETCH24_R)
        with Locations((134.5, 95)):
            Circle(SKETCH24_R)
    extrude(amount=-BOSS_EXTRUDE13_DEPTH)

    # Sketch25 → Cut-Extrude19 (cut)
    with BuildSketch(Plane(origin=(0, 10, 0), x_dir=(1, 0, 0), z_dir=(0, 1, 0)).offset(CUT_EXTRUDE19_START)):
        with Locations(Location((134.5, 120, 0), (0, 0, 270))):
            Circle(SKETCH25_R)
        with Locations(Location((164.5, 120, 0), (0, 0, 270))):
            Circle(SKETCH25_R)
        with Locations(Location((149.5, 105, 0), (0, 0, 270))):
            Circle(SKETCH25_R)
        with Locations(Location((164.5, 90, 0), (0, 0, 270))):
            Circle(SKETCH25_R)
        with Locations(Location((134.5, 90, 0), (0, 0, 270))):
            Circle(SKETCH25_R)
        with Locations(Location((265.5, 120, 0), (0, 0, 270))):
            Circle(SKETCH25_R)
        with Locations(Location((295.5, 120, 0), (0, 0, 270))):
            Circle(SKETCH25_R)
        with Locations(Location((280.5, 105, 0), (0, 0, 270))):
            Circle(SKETCH25_R)
        with Locations(Location((295.5, 90, 0), (0, 0, 270))):
            Circle(SKETCH25_R)
        with Locations(Location((265.5, 90, 0), (0, 0, 270))):
            Circle(SKETCH25_R)
    extrude(amount=CUT_EXTRUDE19_DEPTH, mode=Mode.SUBTRACT)


with BuildPart() as cut_extrude19_kept_piece:
    # of the separate pieces the step leaves, the one the design keeps (cut_extrude19_pieces_kept)
    add(part.part.solids().sort_by_distance((340, 45, -135))[0])

    # Sketch27 → Cut-Extrude20 (cut)
    with BuildSketch(Plane(origin=(0, 67, 0), x_dir=(1, 0, 0), z_dir=(0, 1, 0))):
        with Locations((215, 142.5)):
            Rectangle(SKETCH27_W, SKETCH27_H)
    extrude(amount=-CUT_EXTRUDE20_DEPTH, mode=Mode.SUBTRACT)

    # Sketch28 → Cut-Extrude21 (cut)
    with BuildSketch(Plane.XY.offset(-135)):
        with Locations((265.5, 40)):
            Circle(SKETCH28_R)
        with Locations((295.5, 40)):
            Circle(SKETCH28_R)
        with Locations((134.5, 40)):
            Circle(SKETCH28_R)
        with Locations((164.5, 40)):
            Circle(SKETCH28_R)
    extrude(amount=-CUT_EXTRUDE21_DEPTH, mode=Mode.SUBTRACT)

    # Fillet6
    fillet6_edges = [cut_extrude19_kept_piece.edges().sort_by_distance(p)[0] for p in [
        (90, 45, -142.5),
    ]]
    fillet(fillet6_edges, radius=FILLET6_R)

    # Fillet7
    fillet7_edges = [cut_extrude19_kept_piece.edges().sort_by_distance(p)[0] for p in [
        (340, 45, -142.5),
    ]]
    fillet(fillet7_edges, radius=FILLET7_R)

    # Sketch30 → Boss-Extrude15 (add, through all)
    # profile 1 of 2: a face of its own
    with BuildSketch(Plane.XY.offset(-135)):
        with Locations((200.72, 31)):
            Circle(SKETCH30_R)
        with Locations((200.72, 31)):
            Circle(SKETCH30_R_2, mode=Mode.SUBTRACT)
    # profile 2 of 2: a face of its own
    with BuildSketch(Plane.XY.offset(-135)):
        with Locations((229.28, 31)):
            Circle(SKETCH30_R)
        with Locations((229.28, 31)):
            Circle(SKETCH30_R_2, mode=Mode.SUBTRACT)
    extrude(amount=-BOSS_EXTRUDE15_DEPTH)

    # Sketch32 → Boss-Extrude17 (add, through all)
    with BuildSketch(Plane.XY.offset(-135)):
        with Locations((149.5, 40)):
            Circle(SKETCH32_R)
        with Locations((280.5, 40)):
            Circle(SKETCH32_R)
    extrude(amount=-BOSS_EXTRUDE17_DEPTH)


solid = cut_extrude19_kept_piece.part
